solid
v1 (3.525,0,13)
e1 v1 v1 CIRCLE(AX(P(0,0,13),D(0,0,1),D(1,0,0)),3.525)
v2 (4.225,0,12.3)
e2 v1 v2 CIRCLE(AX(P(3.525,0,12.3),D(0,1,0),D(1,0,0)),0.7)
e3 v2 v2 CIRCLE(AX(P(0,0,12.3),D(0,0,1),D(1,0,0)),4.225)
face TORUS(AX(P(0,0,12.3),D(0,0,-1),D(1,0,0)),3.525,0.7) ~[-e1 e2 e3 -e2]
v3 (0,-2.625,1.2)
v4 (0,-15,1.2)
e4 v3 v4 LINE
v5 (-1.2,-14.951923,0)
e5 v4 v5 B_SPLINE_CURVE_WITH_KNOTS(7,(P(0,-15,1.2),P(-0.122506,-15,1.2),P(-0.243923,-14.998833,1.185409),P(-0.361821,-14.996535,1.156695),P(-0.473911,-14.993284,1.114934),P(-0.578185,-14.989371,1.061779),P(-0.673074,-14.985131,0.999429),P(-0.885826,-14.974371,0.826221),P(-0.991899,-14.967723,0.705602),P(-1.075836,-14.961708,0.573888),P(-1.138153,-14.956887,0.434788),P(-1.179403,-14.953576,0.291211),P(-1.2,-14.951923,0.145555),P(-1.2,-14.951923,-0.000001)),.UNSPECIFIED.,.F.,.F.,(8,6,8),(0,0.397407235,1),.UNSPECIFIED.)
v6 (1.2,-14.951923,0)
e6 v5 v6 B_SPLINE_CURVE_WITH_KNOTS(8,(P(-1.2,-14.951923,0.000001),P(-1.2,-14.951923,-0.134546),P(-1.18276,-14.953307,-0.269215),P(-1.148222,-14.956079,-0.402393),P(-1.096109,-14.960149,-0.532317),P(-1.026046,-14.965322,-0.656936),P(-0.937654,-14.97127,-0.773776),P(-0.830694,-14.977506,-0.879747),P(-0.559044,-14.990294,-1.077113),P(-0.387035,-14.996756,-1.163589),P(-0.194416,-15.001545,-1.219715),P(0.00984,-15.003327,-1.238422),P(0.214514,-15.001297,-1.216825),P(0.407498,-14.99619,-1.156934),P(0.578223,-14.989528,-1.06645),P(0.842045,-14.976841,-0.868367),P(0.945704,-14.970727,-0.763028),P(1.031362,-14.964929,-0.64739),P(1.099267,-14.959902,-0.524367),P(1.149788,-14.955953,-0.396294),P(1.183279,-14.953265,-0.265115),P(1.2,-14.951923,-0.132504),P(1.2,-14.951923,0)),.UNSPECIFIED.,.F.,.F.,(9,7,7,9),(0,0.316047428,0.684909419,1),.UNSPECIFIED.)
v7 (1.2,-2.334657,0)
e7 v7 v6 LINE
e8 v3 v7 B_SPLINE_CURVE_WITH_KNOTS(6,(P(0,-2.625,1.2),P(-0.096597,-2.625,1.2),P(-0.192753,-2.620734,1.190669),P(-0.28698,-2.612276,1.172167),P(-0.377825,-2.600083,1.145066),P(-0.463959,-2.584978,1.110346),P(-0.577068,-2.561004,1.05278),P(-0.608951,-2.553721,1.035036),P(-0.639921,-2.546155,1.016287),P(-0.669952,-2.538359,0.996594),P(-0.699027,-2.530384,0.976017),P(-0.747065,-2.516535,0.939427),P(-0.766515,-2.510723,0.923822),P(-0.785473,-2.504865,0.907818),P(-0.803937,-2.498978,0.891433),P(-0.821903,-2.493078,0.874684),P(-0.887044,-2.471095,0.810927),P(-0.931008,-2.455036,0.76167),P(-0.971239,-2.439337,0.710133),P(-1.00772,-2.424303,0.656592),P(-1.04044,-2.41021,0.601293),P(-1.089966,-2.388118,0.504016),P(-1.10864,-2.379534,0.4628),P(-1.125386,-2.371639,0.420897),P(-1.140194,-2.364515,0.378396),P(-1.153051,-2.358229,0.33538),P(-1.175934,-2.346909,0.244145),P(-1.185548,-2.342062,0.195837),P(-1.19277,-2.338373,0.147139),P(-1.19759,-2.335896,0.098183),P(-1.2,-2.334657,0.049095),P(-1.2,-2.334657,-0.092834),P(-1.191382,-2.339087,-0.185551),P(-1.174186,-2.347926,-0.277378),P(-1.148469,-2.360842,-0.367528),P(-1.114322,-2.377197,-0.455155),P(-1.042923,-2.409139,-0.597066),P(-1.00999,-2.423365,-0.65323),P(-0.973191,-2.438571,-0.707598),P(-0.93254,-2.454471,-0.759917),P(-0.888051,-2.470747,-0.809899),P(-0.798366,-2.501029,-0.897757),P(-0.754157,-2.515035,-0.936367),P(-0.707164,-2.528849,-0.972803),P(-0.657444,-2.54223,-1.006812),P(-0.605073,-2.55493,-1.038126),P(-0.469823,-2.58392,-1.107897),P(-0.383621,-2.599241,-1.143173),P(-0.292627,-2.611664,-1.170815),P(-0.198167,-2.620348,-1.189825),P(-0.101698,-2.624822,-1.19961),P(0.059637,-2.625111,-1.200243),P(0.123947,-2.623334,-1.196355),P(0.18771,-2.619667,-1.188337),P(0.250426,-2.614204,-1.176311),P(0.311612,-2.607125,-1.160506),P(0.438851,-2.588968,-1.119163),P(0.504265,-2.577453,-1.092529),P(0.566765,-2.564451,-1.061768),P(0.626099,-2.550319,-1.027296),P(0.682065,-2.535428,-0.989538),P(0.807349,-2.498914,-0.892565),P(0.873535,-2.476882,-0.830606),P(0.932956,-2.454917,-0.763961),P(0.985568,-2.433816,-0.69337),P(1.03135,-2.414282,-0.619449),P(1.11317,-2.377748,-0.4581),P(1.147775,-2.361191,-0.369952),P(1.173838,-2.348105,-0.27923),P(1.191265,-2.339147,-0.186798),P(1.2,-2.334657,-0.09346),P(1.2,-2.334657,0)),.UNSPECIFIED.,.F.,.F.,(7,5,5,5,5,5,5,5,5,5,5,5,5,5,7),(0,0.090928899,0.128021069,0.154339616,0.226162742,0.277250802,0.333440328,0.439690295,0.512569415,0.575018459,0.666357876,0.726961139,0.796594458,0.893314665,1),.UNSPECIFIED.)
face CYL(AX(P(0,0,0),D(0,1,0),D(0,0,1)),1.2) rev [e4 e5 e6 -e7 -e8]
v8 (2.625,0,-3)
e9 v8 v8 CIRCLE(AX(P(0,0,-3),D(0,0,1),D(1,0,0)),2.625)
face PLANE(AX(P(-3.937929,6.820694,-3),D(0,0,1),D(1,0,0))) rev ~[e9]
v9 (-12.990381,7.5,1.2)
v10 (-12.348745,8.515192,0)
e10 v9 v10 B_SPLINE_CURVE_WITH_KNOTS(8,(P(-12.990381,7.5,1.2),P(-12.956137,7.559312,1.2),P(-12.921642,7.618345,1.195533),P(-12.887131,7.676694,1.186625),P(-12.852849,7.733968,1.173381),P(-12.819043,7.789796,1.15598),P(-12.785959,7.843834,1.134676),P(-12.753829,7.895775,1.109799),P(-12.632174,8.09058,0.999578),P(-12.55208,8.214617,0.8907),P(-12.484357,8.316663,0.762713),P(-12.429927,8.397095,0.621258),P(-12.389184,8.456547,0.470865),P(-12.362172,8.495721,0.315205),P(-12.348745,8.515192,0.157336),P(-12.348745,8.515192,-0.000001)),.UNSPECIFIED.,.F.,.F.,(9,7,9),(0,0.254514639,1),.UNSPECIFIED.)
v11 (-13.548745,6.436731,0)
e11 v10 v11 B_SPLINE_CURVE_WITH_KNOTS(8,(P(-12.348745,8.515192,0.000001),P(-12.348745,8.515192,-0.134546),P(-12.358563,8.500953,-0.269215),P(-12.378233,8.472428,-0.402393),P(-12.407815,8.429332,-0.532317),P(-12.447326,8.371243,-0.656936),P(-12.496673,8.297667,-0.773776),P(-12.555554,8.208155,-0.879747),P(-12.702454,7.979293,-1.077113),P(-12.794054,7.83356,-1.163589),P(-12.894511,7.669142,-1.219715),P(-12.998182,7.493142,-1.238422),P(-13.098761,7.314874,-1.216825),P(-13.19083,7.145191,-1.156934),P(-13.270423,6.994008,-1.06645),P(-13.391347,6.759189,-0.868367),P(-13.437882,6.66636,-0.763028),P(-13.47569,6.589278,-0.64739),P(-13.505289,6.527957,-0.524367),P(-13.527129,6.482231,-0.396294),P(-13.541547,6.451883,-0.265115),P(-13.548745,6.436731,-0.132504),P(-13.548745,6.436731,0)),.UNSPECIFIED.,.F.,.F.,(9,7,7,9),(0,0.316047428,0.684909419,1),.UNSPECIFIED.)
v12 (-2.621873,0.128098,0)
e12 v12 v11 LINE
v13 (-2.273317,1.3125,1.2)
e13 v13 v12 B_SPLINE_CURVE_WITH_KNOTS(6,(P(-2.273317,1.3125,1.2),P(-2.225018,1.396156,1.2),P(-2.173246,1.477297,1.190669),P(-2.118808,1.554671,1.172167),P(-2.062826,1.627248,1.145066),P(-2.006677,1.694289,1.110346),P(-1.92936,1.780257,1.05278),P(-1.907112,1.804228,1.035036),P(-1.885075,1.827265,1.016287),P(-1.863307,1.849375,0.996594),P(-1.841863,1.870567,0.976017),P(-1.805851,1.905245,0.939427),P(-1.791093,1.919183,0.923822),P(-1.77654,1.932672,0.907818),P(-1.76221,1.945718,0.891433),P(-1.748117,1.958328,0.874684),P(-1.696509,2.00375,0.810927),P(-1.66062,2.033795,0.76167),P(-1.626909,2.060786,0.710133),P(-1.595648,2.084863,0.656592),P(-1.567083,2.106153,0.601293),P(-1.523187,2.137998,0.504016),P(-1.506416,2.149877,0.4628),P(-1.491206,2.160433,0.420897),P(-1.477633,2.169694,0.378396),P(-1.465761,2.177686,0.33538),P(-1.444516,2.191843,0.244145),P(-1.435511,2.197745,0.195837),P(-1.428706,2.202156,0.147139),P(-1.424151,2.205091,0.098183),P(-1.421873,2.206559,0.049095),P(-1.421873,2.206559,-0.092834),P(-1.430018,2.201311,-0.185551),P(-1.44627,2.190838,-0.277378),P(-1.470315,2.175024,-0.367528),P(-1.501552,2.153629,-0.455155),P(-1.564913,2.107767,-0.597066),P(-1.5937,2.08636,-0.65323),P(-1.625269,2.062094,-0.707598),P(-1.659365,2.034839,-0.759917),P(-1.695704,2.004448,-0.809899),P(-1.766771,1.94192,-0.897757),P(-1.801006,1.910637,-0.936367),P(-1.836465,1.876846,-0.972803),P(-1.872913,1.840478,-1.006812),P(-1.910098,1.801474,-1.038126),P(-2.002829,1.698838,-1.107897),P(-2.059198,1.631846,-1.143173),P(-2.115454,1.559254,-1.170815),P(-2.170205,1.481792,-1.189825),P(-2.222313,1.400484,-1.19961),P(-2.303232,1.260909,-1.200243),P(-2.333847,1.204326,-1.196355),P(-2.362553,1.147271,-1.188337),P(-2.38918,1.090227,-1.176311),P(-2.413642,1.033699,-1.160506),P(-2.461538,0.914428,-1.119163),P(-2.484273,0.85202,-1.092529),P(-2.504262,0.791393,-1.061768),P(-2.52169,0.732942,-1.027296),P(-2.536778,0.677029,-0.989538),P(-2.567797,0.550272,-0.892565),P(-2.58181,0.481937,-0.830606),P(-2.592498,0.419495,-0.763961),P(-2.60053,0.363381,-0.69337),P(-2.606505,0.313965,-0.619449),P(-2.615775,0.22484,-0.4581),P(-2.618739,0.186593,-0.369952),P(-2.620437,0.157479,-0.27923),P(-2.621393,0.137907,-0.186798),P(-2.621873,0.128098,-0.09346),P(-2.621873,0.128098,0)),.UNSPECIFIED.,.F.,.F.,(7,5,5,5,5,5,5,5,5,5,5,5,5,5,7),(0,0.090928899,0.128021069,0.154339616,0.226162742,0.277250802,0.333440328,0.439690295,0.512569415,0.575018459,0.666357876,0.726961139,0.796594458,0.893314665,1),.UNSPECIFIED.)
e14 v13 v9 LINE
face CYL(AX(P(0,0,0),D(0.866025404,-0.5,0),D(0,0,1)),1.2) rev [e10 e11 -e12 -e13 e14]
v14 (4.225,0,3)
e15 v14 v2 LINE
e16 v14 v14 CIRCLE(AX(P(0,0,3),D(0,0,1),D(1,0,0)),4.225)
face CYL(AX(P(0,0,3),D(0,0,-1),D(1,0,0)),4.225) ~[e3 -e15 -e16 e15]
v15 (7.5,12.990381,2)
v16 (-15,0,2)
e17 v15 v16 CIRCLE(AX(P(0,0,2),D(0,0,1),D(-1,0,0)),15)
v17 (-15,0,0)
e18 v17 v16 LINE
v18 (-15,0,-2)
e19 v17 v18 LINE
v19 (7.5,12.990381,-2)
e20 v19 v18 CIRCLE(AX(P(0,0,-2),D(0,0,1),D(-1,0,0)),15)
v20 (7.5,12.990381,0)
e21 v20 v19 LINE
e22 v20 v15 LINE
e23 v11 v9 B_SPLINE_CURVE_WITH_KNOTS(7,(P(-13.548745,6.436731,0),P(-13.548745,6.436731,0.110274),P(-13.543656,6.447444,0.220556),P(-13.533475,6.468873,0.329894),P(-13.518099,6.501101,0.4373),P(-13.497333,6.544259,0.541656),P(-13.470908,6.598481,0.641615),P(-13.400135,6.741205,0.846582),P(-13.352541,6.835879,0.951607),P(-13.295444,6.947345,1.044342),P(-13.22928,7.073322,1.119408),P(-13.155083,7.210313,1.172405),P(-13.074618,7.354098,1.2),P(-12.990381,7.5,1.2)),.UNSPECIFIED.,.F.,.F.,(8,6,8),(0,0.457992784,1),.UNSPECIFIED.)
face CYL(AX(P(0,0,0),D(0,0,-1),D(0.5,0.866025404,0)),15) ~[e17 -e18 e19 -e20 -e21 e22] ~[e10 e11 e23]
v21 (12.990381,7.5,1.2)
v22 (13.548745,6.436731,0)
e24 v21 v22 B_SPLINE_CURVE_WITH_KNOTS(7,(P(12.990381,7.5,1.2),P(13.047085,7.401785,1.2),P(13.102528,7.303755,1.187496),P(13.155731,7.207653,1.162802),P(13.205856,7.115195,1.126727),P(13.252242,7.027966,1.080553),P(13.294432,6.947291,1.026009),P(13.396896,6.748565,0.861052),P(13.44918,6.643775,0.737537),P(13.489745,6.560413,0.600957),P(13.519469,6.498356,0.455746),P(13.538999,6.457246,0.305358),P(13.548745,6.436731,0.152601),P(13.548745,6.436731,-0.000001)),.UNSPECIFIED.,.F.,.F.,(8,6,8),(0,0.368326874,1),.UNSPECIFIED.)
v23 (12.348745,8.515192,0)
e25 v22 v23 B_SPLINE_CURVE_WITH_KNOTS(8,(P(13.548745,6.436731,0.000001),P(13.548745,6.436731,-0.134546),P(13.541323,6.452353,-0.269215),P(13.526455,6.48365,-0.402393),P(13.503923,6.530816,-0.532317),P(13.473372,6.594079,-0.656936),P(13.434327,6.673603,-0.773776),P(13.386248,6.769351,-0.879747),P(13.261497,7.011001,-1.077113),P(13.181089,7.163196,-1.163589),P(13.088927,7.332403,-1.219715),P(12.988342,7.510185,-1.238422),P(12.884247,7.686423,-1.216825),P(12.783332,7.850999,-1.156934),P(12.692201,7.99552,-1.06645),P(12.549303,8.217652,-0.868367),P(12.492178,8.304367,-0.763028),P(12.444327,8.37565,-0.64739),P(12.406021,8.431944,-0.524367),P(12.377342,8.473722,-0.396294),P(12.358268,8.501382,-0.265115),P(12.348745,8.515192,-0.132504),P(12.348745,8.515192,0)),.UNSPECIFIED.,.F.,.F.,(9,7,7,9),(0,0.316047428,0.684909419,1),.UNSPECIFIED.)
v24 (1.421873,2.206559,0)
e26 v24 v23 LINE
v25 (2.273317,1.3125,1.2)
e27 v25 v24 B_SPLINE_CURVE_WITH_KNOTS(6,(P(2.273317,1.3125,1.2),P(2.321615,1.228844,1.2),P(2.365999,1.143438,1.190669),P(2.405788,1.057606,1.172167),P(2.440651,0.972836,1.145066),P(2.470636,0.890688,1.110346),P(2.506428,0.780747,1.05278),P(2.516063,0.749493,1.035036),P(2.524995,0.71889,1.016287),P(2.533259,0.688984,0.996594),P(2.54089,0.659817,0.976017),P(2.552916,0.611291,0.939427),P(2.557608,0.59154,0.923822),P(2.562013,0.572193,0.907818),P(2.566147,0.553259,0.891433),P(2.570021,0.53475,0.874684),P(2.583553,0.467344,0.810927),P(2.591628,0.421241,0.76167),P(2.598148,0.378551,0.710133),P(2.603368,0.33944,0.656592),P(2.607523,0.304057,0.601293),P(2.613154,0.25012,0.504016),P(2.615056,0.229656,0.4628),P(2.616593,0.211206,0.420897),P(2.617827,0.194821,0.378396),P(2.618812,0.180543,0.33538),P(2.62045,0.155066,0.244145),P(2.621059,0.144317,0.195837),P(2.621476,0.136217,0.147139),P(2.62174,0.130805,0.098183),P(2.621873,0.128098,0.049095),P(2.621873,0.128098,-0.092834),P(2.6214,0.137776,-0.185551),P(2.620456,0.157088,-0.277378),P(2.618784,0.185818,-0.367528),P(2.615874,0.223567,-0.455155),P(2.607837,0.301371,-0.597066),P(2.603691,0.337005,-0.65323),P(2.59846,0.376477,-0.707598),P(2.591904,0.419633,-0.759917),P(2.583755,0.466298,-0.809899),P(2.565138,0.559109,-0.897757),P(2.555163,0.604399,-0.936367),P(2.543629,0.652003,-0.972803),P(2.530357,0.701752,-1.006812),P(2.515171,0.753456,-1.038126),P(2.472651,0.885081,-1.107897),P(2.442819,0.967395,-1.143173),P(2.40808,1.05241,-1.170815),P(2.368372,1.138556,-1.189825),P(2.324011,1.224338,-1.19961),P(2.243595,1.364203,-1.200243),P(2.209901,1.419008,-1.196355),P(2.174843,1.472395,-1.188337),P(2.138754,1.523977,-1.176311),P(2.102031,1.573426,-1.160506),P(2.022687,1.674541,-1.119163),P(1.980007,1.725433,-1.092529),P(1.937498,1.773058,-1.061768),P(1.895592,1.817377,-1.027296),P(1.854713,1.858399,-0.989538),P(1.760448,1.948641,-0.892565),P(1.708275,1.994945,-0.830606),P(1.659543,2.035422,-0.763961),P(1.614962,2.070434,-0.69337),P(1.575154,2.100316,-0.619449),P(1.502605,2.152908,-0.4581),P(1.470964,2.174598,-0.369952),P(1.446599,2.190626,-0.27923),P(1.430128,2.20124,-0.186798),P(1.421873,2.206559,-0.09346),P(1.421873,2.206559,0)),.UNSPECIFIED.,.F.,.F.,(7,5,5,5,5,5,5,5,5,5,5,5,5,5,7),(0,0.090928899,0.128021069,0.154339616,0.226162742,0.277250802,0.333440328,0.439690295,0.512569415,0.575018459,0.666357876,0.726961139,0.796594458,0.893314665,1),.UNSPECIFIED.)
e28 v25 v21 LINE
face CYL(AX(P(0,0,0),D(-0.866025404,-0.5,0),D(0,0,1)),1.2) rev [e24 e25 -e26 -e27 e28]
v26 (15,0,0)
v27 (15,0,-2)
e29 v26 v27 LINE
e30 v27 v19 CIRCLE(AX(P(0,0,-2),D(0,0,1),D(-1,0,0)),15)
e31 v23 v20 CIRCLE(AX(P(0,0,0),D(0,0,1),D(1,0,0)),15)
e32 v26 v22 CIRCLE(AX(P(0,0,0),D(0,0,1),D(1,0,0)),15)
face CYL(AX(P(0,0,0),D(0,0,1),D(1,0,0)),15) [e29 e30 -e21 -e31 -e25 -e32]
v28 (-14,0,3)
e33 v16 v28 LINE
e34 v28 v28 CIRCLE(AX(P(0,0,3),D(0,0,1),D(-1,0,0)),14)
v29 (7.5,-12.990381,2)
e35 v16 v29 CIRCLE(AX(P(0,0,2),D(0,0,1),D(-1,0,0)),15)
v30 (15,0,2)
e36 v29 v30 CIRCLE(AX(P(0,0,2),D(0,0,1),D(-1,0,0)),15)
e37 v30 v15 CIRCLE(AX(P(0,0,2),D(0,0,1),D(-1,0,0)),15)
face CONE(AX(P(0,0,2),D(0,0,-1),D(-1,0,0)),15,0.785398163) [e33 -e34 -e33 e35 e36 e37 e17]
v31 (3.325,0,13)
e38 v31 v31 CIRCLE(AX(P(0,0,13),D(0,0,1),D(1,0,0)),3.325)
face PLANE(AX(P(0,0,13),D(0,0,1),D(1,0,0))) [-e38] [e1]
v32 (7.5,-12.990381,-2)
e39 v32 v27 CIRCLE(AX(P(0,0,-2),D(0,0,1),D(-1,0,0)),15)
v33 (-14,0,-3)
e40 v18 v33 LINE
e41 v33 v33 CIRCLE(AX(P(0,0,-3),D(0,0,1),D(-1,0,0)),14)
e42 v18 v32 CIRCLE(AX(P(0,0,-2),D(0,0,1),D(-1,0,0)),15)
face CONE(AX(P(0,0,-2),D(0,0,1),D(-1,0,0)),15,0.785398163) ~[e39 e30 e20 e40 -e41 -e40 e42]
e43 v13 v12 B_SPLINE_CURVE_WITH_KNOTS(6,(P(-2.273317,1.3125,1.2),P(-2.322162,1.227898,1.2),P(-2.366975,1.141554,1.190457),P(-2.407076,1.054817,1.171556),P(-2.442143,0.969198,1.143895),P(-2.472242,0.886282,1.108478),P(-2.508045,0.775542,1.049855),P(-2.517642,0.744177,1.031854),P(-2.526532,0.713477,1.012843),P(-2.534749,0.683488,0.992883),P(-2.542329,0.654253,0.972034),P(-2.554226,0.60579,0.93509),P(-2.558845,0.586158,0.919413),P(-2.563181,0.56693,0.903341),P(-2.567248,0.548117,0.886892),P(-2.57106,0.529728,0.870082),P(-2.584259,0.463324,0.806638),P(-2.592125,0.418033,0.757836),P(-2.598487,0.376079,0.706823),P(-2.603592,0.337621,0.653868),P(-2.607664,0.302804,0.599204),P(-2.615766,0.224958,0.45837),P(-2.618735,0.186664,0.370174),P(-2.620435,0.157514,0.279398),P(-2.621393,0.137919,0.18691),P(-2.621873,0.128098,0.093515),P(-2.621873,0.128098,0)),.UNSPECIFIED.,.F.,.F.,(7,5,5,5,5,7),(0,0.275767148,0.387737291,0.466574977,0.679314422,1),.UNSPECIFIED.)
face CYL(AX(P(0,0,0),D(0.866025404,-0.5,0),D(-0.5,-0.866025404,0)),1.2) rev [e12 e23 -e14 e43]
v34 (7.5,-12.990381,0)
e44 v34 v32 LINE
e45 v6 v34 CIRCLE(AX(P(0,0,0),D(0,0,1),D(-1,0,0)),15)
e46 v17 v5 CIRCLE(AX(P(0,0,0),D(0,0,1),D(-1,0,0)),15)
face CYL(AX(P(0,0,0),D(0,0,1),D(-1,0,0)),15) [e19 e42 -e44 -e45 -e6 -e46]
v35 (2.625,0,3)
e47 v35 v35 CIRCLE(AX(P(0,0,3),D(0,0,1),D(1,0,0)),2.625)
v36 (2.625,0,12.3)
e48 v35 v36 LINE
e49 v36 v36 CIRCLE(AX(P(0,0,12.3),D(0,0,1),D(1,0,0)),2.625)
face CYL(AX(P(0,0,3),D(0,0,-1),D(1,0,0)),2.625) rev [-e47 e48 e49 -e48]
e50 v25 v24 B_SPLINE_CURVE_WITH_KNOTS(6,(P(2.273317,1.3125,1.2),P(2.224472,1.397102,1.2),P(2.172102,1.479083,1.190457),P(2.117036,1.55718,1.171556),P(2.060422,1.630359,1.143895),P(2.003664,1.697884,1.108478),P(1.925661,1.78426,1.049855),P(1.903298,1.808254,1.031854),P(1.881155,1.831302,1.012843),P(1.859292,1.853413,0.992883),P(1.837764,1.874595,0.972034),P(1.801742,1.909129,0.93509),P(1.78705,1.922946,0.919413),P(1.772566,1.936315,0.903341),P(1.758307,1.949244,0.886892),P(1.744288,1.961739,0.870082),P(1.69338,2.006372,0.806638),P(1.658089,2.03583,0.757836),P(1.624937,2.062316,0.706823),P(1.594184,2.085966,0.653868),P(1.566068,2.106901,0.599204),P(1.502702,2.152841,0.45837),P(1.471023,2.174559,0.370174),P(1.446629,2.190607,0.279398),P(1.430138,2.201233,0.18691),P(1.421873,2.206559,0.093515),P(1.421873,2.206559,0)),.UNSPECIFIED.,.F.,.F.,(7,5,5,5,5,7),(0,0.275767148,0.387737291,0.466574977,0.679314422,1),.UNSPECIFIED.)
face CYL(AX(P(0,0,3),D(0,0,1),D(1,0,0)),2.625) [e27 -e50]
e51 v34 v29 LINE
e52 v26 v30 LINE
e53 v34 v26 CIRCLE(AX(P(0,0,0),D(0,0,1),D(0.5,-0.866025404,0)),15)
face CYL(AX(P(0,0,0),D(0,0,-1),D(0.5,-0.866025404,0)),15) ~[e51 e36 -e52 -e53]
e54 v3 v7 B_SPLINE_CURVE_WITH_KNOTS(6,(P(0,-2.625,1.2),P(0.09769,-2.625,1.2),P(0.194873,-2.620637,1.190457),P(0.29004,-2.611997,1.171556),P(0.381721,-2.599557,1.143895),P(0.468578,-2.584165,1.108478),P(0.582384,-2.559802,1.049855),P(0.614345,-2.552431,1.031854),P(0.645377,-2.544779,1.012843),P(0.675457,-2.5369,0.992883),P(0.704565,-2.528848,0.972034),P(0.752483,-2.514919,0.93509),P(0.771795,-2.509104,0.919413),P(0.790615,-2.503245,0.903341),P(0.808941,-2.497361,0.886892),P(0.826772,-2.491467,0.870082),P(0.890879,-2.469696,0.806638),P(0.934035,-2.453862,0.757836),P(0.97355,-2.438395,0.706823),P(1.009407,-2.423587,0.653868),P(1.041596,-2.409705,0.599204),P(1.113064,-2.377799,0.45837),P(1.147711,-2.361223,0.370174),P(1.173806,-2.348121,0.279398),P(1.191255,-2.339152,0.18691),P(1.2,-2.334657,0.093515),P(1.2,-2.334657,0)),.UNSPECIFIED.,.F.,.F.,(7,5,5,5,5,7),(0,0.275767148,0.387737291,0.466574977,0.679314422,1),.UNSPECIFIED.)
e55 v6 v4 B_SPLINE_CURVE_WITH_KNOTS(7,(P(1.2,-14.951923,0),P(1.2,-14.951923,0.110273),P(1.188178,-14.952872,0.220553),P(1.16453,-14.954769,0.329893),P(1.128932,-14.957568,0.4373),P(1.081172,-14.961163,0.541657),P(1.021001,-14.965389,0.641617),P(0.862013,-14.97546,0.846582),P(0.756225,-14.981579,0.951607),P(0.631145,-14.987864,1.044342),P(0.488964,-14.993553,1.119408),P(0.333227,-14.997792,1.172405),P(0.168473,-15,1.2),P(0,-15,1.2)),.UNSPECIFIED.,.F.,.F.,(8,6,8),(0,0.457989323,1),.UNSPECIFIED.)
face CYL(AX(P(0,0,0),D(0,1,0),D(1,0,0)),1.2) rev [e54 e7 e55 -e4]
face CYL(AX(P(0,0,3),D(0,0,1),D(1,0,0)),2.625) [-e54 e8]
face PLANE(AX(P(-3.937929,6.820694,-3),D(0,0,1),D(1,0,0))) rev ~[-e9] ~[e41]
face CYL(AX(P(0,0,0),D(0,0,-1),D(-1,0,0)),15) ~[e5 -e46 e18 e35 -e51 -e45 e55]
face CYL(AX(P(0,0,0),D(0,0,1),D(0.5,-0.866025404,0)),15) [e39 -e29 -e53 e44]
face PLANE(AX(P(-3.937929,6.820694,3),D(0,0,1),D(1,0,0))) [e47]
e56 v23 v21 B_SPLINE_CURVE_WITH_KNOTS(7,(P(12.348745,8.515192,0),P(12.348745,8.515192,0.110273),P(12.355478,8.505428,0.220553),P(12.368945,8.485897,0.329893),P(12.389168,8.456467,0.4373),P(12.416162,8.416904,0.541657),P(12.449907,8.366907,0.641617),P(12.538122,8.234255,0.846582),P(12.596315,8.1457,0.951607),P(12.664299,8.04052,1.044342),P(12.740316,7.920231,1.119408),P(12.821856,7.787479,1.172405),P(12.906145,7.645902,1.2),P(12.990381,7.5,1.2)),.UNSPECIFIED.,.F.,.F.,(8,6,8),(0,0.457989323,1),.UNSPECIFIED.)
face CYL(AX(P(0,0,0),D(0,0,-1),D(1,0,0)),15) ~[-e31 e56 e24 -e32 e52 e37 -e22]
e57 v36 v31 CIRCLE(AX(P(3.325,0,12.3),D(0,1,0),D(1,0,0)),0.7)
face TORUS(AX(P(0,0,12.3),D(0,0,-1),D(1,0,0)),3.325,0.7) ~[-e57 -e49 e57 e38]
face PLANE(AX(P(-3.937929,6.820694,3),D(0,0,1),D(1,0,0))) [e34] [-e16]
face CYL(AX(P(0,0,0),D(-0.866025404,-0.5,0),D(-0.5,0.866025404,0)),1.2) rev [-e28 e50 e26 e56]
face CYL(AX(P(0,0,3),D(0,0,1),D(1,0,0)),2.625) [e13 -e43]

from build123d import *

# Parameters (mm, degrees)
F2_DEPTH = 25
F3_COUNT = 3
F4_DEPTH = 3
F6_R     = 4.225
F6_R_2   = 2.625
F7_DEPTH = 10
F9_DEPTH = 6
F10_R    = 0.7


# Not quite as in the source:
# - a fillet or chamfer that OpenCascade refuses, or shapes differently, is made with other operations: its cross-section is extruded or revolved along the edge and cut away or added


with BuildPart() as f2:
    # F1 (on Front) → F2 (new body)
    with BuildSketch(Plane.XZ):
        with BuildLine():
            ThreePointArc((0, 1.2), (-0.8485281374, -0.8485281374), (1.2, 0))
            ThreePointArc((1.2, 0), (0.8485281374, 0.8485281374), (0, 1.2))
        make_face()
    extrude(amount=F2_DEPTH)

    # F3: F2 ×3 about axis
    f3_axis = Axis((0, 0, 16.2680745125), (0, 0, 1))


with BuildPart() as f2_1:
    add(f2.part)
    for i in range(1, F3_COUNT):
        add(f2.part.rotate(f3_axis, i * 360 / F3_COUNT))


with BuildPart() as f4:
    # F0 (on Top) → F4 (new body, symmetric)
    with BuildSketch(Plane.XY):
        with BuildLine():
            Line((0, 0), (7.5, 12.9903810568))
            ThreePointArc((7.5, 12.9903810568), (-7.5, 12.9903810568), (-15, 0))
            Line((-15, 0), (0, 0))
        make_face()
        with BuildLine():
            ThreePointArc((-15, 0), (-7.5, -12.9903810568), (7.5, -12.9903810568))
            Line((7.5, -12.9903810568), (0, 0))
            Line((0, 0), (-15, 0))
        make_face()
        with BuildLine():
            ThreePointArc((7.5, -12.9903810568), (12.9903810568, -7.5), (15, 0))
            ThreePointArc((15, 0), (12.9903810568, 7.5), (7.5, 12.9903810568))
            Line((7.5, 12.9903810568), (0, 0))
            Line((0, 0), (7.5, -12.9903810568))
        make_face()
        with BuildLine():
            Line((0, 0), (7.5, 12.9903810568))
            ThreePointArc((7.5, 12.9903810568), (-7.5, 12.9903810568), (-15, 0))
            Line((-15, 0), (0, 0))
        make_face()
        with BuildLine():
            ThreePointArc((-15, 0), (-7.5, -12.9903810568), (7.5, -12.9903810568))
            Line((7.5, -12.9903810568), (0, 0))
            Line((0, 0), (-15, 0))
        make_face()
        with BuildLine():
            ThreePointArc((7.5, -12.9903810568), (12.9903810568, -7.5), (15, 0))
            ThreePointArc((15, 0), (12.9903810568, 7.5), (7.5, 12.9903810568))
            Line((7.5, 12.9903810568), (0, 0))
            Line((0, 0), (7.5, -12.9903810568))
        make_face()
    extrude(amount=F4_DEPTH, both=True)

    # F5: cut F2
    add(f2_1.part, mode=Mode.SUBTRACT)

    # F6 (on face) → F7 (join)
    with BuildSketch(Plane.XY.offset(3)):
        Circle(F6_R)
        Circle(F6_R_2, mode=Mode.SUBTRACT)
    extrude(amount=F7_DEPTH)

    # F8: chamfer of 1 on 2 edges, made by hand

    # F8_s1 → F8_t2 (revolve, cut)
    with BuildSketch(Plane.XZ):
        Polygon((-15, 2), (-14, 3), (-15, 3), align=None)
    revolve(axis=Axis((0, 0, 3), (0, 0, 1)), mode=Mode.SUBTRACT)

    # F8_s3 → F8_t4 (revolve, cut)
    with BuildSketch(Plane.XZ):
        Polygon((-15, -2), (-14, -3), (-15, -3), align=None)
    revolve(axis=Axis((0, 0, -3), (0, 0, 1)), mode=Mode.SUBTRACT)

    # F9 (add): a face of the model
    f9_faces = [f4.faces().sort_by_distance(p)[0] for p in [
        (0, 0, 3),
    ]]
    extrude(f9_faces, amount=-F9_DEPTH)

    # F10
    f10_edges = [f4.edges().sort_by_distance(p)[0] for p in [
        (-2.625, 0, 13),
        (-4.225, 0, 13),
    ]]
    fillet(f10_edges, radius=F10_R)


solid = f4.part
